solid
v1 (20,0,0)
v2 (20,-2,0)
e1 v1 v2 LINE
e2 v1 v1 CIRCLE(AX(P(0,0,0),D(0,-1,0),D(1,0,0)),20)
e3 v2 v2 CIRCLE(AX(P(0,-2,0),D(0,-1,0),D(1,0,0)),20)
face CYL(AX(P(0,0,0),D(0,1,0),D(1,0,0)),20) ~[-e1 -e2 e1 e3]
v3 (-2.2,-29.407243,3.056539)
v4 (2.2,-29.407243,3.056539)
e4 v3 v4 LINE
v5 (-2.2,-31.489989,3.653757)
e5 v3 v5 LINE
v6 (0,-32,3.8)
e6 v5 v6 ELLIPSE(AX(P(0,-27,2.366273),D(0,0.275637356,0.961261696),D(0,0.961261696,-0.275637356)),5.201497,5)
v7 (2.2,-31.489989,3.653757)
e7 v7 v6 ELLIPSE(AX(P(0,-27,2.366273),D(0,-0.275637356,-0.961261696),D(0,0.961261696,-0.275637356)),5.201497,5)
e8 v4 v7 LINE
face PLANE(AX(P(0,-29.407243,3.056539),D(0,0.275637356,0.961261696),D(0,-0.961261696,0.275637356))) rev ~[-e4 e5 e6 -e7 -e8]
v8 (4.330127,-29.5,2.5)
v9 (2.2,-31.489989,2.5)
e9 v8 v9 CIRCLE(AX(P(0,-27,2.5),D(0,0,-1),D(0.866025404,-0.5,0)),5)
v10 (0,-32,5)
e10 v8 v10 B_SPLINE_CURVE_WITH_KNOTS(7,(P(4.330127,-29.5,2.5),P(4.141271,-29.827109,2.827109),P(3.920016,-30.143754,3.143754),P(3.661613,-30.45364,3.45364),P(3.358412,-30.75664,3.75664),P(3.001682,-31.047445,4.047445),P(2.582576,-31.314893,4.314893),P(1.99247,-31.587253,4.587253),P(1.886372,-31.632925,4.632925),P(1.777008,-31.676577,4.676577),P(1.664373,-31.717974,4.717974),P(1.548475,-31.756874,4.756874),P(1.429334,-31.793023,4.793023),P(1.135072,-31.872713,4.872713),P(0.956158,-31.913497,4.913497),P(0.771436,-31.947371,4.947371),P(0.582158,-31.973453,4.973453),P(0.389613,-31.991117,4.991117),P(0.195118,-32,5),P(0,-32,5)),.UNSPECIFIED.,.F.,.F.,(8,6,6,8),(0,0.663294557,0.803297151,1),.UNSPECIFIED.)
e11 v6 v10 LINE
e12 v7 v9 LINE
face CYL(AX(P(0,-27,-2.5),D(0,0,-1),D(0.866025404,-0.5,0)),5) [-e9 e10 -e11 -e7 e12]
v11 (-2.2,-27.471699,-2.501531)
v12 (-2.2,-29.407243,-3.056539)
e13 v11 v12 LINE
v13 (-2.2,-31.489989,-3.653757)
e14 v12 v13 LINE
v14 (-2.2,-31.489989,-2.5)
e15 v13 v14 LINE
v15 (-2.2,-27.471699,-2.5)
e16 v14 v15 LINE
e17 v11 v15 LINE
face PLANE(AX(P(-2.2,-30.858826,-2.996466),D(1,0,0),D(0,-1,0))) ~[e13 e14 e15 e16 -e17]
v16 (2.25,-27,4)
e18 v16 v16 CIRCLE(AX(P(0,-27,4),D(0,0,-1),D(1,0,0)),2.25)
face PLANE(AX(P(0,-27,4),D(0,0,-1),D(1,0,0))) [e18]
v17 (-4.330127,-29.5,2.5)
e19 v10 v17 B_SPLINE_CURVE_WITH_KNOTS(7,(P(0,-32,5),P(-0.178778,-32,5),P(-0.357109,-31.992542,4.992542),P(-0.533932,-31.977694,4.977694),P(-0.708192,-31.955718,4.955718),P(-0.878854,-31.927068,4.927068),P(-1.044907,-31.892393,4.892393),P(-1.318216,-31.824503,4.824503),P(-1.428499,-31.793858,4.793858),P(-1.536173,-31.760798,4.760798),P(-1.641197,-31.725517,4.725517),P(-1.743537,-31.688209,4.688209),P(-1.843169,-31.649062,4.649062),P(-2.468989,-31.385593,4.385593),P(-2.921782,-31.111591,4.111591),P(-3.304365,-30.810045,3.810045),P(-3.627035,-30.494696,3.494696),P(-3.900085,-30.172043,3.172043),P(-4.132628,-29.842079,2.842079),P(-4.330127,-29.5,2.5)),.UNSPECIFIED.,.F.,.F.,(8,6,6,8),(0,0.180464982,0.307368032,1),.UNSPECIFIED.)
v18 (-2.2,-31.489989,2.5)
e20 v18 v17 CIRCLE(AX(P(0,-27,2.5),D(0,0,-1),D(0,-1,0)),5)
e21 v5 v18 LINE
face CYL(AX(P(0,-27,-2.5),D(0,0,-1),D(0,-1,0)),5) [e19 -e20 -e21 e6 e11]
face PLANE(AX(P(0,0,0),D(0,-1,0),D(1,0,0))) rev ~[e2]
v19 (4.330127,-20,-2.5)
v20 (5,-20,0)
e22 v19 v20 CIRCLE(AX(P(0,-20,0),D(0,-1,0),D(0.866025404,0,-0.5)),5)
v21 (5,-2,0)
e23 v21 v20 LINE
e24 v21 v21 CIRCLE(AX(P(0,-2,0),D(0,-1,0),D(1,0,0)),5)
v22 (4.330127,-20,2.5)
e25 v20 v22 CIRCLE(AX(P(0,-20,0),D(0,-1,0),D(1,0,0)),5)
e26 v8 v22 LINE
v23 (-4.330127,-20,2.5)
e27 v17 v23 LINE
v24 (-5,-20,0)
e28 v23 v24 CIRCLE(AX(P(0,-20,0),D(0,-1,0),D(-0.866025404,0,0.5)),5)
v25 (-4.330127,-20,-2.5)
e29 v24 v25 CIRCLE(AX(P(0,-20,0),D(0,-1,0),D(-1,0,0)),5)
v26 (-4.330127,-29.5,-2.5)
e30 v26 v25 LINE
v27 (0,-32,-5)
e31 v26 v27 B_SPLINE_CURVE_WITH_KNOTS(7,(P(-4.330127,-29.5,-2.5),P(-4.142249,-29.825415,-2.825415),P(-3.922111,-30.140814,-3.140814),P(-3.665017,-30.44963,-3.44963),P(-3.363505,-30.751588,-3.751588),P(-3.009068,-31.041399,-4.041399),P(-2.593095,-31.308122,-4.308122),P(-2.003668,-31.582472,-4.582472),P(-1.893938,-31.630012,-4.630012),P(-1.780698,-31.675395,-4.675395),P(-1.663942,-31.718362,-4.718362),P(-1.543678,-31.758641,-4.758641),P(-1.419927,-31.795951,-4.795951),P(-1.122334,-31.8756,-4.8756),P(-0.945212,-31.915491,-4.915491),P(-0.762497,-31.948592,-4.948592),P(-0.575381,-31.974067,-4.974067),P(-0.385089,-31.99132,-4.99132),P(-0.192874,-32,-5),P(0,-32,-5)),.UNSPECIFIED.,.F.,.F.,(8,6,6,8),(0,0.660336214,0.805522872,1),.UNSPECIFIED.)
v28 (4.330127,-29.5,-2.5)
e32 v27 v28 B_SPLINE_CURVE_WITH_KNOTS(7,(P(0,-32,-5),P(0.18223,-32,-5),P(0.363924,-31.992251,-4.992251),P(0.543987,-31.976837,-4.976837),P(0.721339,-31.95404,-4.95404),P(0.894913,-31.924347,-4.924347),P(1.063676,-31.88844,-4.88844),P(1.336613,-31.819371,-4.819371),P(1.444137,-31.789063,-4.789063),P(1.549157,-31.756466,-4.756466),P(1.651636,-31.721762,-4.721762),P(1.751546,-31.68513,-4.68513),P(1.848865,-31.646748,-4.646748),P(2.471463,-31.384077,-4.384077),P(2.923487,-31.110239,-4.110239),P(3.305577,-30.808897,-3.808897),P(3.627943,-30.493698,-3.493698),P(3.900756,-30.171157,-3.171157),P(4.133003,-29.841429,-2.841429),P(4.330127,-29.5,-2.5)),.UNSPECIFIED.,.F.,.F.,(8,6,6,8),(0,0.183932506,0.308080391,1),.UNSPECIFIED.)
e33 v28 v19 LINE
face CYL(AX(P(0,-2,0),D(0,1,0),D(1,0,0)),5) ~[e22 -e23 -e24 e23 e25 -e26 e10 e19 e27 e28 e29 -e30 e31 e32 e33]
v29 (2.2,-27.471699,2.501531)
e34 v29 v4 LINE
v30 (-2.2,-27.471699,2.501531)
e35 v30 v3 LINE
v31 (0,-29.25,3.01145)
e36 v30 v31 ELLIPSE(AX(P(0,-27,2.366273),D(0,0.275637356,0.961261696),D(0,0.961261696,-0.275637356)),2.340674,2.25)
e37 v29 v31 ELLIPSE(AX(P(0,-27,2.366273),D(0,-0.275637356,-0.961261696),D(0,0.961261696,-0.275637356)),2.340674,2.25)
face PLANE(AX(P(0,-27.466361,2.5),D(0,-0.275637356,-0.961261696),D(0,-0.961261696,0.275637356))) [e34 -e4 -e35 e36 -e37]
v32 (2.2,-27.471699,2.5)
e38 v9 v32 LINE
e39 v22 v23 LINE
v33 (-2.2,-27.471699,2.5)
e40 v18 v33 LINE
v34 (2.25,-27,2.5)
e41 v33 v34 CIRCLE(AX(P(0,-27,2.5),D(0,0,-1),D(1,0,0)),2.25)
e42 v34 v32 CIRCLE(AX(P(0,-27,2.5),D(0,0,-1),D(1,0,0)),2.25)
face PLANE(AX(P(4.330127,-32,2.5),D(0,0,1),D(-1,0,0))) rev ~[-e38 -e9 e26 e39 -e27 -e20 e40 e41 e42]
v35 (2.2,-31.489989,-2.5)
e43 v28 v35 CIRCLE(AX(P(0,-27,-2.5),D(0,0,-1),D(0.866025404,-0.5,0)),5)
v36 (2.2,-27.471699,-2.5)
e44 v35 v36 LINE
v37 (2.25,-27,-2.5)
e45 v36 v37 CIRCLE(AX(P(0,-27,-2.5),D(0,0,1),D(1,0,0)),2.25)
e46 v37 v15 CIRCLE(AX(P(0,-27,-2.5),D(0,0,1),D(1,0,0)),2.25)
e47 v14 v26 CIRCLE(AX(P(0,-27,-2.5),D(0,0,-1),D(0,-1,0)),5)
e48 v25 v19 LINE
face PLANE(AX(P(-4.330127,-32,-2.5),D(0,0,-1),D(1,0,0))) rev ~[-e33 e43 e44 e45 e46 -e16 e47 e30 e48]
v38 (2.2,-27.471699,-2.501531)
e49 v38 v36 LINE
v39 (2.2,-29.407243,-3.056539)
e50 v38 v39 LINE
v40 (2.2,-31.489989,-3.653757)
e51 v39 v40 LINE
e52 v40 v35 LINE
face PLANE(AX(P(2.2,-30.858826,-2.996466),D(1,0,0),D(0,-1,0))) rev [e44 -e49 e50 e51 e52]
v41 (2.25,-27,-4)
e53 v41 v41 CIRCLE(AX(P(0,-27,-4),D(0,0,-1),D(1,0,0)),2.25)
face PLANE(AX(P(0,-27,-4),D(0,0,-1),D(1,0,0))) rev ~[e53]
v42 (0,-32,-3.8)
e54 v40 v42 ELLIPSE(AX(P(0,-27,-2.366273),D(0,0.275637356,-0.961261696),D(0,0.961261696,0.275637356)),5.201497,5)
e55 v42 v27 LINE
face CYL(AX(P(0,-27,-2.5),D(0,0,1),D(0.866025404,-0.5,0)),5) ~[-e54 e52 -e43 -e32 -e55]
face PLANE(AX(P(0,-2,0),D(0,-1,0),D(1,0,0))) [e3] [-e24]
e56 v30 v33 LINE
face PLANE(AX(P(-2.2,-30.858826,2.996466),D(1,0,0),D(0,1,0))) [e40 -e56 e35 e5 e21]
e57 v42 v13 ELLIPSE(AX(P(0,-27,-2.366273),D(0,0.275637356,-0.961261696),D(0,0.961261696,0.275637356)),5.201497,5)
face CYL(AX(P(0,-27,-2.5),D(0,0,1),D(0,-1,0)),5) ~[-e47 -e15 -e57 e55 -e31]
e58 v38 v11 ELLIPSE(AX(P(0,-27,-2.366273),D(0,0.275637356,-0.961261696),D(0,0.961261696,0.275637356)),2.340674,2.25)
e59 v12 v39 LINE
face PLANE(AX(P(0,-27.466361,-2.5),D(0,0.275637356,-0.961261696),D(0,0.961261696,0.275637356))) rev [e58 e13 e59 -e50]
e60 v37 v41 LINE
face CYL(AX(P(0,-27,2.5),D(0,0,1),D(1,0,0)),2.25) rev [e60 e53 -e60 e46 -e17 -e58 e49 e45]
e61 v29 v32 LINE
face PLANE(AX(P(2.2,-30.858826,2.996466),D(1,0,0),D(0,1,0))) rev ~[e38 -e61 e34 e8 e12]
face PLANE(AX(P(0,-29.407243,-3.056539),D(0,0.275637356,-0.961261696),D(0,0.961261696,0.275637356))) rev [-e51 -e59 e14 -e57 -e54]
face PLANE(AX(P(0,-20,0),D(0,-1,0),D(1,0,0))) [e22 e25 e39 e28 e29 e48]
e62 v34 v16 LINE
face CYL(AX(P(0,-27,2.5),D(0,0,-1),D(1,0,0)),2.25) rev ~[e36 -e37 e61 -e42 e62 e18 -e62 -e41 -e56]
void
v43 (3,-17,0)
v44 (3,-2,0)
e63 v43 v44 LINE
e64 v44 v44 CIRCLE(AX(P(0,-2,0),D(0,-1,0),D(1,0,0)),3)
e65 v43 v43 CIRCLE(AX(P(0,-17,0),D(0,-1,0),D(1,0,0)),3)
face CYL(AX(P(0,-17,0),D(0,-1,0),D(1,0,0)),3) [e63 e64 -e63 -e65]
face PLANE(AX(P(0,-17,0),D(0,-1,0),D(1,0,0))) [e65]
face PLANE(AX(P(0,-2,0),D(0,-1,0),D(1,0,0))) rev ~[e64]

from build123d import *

# Parameters (mm, degrees)
F0_R           = 20
F1_DEPTH       = 2
F2_R           = 5
F3_DEPTH       = 30
F6_DEPTH       = 12
F7_R           = 2.25
F8_DEPTH       = 1.5
F8_DEPTH_BACK  = 6.5
F10_DEPTH      = 17.501
F10_DEPTH_BACK = 22.501
F12_DEPTH      = 2.2
F12_DEPTH_BACK = 2.2
F15_R          = 3
F16_DEPTH      = 15


# Not quite as in the source:
# - a pattern or mirror of a feature is missing from the dataset's text; its kind, count and spacing are read off the source's solid


with BuildPart() as f1:
    # F0 (on Front) → F1 (new body)
    with BuildSketch(Plane.XZ):
        Circle(F0_R)
    extrude(amount=F1_DEPTH)

    # F2 (on face) → F3 (join)
    with BuildSketch(Plane.XZ.offset(2)):
        Circle(F2_R)
    extrude(amount=F3_DEPTH)

    # F5 (on face) → F6 (cut)
    with BuildSketch(Plane.XZ.offset(32)):
        with BuildLine():
            Line((4.3301270189, 2.5), (-4.3301270189, 2.5))
            ThreePointArc((-4.3301270189, 2.5), (-4.8296291314, 1.2940952255), (-5, 0))
            ThreePointArc((-5, 0), (-4.8296291314, -1.2940952255), (-4.3301270189, -2.5))
            Line((-4.3301270189, -2.5), (4.3301270189, -2.5))
            ThreePointArc((4.3301270189, -2.5), (4.8296291314, -1.2940952255), (5, 0))
            ThreePointArc((5, 0), (4.8296291314, 1.2940952255), (4.3301270189, 2.5))
        make_face()
    extrude(amount=-F6_DEPTH, mode=Mode.SUBTRACT)

    # F7 (on face) → F8 (cut, two sides)
    with BuildSketch(Plane(origin=(0, 0, 2.5), x_dir=(1, 0, 0), z_dir=(0, 0, -1))) as f8_sk:
        with Locations((0, 27)):
            Circle(F7_R)
    extrude(amount=-F8_DEPTH, mode=Mode.SUBTRACT)
    extrude(f8_sk.sketch, amount=F8_DEPTH_BACK, mode=Mode.SUBTRACT)

    # F9 (on face) → F10 (cut, two sides)
    with BuildSketch(Plane.XY.offset(-2.5)) as f10_sk:
        with BuildLine():
            Line((4.3301270189, -32), (4.3301270189, -29.5))
            ThreePointArc((4.3301270189, -29.5), (2.5, -31.3301270189), (0, -32))
            Line((0, -32), (4.3301270189, -32))
        make_face()
        with BuildLine():
            Line((-4.3301270189, -32), (0, -32))
            ThreePointArc((0, -32), (-2.5, -31.3301270189), (-4.3301270189, -29.5))
            Line((-4.3301270189, -29.5), (-4.3301270189, -32))
        make_face()
    extrude(amount=-F10_DEPTH, mode=Mode.SUBTRACT)
    extrude(f10_sk.sketch, amount=F10_DEPTH_BACK, mode=Mode.SUBTRACT)

    # F11 (on Right) → F12 (cut, two sides)
    with BuildSketch(Plane.YZ) as f12_sk:
        Polygon((-32, 2.5), (-29.5, 2.5), (-29.4072434941, 3.0565390355), (-32, 3.8), align=None)
        Polygon((-29.5, 2.5), (-27.466361223, 2.5), (-29.4072434941, 3.0565390355), align=None)
    f12 = extrude(amount=-F12_DEPTH, mode=Mode.SUBTRACT) + extrude(f12_sk.sketch, amount=F12_DEPTH_BACK, mode=Mode.SUBTRACT)

    # F12_copies: F12 across plane
    add(f12.mirror(Plane(origin=(0, 0, 0), x_dir=(-1, 0, 0), z_dir=(0, 0, -1))), mode=Mode.SUBTRACT)

    # F15 (on offset) → F16 (cut, through all)
    with BuildSketch(Plane.XZ.offset(17)):
        Circle(F15_R)
    extrude(amount=-F16_DEPTH, mode=Mode.SUBTRACT)


solid = f1.part
